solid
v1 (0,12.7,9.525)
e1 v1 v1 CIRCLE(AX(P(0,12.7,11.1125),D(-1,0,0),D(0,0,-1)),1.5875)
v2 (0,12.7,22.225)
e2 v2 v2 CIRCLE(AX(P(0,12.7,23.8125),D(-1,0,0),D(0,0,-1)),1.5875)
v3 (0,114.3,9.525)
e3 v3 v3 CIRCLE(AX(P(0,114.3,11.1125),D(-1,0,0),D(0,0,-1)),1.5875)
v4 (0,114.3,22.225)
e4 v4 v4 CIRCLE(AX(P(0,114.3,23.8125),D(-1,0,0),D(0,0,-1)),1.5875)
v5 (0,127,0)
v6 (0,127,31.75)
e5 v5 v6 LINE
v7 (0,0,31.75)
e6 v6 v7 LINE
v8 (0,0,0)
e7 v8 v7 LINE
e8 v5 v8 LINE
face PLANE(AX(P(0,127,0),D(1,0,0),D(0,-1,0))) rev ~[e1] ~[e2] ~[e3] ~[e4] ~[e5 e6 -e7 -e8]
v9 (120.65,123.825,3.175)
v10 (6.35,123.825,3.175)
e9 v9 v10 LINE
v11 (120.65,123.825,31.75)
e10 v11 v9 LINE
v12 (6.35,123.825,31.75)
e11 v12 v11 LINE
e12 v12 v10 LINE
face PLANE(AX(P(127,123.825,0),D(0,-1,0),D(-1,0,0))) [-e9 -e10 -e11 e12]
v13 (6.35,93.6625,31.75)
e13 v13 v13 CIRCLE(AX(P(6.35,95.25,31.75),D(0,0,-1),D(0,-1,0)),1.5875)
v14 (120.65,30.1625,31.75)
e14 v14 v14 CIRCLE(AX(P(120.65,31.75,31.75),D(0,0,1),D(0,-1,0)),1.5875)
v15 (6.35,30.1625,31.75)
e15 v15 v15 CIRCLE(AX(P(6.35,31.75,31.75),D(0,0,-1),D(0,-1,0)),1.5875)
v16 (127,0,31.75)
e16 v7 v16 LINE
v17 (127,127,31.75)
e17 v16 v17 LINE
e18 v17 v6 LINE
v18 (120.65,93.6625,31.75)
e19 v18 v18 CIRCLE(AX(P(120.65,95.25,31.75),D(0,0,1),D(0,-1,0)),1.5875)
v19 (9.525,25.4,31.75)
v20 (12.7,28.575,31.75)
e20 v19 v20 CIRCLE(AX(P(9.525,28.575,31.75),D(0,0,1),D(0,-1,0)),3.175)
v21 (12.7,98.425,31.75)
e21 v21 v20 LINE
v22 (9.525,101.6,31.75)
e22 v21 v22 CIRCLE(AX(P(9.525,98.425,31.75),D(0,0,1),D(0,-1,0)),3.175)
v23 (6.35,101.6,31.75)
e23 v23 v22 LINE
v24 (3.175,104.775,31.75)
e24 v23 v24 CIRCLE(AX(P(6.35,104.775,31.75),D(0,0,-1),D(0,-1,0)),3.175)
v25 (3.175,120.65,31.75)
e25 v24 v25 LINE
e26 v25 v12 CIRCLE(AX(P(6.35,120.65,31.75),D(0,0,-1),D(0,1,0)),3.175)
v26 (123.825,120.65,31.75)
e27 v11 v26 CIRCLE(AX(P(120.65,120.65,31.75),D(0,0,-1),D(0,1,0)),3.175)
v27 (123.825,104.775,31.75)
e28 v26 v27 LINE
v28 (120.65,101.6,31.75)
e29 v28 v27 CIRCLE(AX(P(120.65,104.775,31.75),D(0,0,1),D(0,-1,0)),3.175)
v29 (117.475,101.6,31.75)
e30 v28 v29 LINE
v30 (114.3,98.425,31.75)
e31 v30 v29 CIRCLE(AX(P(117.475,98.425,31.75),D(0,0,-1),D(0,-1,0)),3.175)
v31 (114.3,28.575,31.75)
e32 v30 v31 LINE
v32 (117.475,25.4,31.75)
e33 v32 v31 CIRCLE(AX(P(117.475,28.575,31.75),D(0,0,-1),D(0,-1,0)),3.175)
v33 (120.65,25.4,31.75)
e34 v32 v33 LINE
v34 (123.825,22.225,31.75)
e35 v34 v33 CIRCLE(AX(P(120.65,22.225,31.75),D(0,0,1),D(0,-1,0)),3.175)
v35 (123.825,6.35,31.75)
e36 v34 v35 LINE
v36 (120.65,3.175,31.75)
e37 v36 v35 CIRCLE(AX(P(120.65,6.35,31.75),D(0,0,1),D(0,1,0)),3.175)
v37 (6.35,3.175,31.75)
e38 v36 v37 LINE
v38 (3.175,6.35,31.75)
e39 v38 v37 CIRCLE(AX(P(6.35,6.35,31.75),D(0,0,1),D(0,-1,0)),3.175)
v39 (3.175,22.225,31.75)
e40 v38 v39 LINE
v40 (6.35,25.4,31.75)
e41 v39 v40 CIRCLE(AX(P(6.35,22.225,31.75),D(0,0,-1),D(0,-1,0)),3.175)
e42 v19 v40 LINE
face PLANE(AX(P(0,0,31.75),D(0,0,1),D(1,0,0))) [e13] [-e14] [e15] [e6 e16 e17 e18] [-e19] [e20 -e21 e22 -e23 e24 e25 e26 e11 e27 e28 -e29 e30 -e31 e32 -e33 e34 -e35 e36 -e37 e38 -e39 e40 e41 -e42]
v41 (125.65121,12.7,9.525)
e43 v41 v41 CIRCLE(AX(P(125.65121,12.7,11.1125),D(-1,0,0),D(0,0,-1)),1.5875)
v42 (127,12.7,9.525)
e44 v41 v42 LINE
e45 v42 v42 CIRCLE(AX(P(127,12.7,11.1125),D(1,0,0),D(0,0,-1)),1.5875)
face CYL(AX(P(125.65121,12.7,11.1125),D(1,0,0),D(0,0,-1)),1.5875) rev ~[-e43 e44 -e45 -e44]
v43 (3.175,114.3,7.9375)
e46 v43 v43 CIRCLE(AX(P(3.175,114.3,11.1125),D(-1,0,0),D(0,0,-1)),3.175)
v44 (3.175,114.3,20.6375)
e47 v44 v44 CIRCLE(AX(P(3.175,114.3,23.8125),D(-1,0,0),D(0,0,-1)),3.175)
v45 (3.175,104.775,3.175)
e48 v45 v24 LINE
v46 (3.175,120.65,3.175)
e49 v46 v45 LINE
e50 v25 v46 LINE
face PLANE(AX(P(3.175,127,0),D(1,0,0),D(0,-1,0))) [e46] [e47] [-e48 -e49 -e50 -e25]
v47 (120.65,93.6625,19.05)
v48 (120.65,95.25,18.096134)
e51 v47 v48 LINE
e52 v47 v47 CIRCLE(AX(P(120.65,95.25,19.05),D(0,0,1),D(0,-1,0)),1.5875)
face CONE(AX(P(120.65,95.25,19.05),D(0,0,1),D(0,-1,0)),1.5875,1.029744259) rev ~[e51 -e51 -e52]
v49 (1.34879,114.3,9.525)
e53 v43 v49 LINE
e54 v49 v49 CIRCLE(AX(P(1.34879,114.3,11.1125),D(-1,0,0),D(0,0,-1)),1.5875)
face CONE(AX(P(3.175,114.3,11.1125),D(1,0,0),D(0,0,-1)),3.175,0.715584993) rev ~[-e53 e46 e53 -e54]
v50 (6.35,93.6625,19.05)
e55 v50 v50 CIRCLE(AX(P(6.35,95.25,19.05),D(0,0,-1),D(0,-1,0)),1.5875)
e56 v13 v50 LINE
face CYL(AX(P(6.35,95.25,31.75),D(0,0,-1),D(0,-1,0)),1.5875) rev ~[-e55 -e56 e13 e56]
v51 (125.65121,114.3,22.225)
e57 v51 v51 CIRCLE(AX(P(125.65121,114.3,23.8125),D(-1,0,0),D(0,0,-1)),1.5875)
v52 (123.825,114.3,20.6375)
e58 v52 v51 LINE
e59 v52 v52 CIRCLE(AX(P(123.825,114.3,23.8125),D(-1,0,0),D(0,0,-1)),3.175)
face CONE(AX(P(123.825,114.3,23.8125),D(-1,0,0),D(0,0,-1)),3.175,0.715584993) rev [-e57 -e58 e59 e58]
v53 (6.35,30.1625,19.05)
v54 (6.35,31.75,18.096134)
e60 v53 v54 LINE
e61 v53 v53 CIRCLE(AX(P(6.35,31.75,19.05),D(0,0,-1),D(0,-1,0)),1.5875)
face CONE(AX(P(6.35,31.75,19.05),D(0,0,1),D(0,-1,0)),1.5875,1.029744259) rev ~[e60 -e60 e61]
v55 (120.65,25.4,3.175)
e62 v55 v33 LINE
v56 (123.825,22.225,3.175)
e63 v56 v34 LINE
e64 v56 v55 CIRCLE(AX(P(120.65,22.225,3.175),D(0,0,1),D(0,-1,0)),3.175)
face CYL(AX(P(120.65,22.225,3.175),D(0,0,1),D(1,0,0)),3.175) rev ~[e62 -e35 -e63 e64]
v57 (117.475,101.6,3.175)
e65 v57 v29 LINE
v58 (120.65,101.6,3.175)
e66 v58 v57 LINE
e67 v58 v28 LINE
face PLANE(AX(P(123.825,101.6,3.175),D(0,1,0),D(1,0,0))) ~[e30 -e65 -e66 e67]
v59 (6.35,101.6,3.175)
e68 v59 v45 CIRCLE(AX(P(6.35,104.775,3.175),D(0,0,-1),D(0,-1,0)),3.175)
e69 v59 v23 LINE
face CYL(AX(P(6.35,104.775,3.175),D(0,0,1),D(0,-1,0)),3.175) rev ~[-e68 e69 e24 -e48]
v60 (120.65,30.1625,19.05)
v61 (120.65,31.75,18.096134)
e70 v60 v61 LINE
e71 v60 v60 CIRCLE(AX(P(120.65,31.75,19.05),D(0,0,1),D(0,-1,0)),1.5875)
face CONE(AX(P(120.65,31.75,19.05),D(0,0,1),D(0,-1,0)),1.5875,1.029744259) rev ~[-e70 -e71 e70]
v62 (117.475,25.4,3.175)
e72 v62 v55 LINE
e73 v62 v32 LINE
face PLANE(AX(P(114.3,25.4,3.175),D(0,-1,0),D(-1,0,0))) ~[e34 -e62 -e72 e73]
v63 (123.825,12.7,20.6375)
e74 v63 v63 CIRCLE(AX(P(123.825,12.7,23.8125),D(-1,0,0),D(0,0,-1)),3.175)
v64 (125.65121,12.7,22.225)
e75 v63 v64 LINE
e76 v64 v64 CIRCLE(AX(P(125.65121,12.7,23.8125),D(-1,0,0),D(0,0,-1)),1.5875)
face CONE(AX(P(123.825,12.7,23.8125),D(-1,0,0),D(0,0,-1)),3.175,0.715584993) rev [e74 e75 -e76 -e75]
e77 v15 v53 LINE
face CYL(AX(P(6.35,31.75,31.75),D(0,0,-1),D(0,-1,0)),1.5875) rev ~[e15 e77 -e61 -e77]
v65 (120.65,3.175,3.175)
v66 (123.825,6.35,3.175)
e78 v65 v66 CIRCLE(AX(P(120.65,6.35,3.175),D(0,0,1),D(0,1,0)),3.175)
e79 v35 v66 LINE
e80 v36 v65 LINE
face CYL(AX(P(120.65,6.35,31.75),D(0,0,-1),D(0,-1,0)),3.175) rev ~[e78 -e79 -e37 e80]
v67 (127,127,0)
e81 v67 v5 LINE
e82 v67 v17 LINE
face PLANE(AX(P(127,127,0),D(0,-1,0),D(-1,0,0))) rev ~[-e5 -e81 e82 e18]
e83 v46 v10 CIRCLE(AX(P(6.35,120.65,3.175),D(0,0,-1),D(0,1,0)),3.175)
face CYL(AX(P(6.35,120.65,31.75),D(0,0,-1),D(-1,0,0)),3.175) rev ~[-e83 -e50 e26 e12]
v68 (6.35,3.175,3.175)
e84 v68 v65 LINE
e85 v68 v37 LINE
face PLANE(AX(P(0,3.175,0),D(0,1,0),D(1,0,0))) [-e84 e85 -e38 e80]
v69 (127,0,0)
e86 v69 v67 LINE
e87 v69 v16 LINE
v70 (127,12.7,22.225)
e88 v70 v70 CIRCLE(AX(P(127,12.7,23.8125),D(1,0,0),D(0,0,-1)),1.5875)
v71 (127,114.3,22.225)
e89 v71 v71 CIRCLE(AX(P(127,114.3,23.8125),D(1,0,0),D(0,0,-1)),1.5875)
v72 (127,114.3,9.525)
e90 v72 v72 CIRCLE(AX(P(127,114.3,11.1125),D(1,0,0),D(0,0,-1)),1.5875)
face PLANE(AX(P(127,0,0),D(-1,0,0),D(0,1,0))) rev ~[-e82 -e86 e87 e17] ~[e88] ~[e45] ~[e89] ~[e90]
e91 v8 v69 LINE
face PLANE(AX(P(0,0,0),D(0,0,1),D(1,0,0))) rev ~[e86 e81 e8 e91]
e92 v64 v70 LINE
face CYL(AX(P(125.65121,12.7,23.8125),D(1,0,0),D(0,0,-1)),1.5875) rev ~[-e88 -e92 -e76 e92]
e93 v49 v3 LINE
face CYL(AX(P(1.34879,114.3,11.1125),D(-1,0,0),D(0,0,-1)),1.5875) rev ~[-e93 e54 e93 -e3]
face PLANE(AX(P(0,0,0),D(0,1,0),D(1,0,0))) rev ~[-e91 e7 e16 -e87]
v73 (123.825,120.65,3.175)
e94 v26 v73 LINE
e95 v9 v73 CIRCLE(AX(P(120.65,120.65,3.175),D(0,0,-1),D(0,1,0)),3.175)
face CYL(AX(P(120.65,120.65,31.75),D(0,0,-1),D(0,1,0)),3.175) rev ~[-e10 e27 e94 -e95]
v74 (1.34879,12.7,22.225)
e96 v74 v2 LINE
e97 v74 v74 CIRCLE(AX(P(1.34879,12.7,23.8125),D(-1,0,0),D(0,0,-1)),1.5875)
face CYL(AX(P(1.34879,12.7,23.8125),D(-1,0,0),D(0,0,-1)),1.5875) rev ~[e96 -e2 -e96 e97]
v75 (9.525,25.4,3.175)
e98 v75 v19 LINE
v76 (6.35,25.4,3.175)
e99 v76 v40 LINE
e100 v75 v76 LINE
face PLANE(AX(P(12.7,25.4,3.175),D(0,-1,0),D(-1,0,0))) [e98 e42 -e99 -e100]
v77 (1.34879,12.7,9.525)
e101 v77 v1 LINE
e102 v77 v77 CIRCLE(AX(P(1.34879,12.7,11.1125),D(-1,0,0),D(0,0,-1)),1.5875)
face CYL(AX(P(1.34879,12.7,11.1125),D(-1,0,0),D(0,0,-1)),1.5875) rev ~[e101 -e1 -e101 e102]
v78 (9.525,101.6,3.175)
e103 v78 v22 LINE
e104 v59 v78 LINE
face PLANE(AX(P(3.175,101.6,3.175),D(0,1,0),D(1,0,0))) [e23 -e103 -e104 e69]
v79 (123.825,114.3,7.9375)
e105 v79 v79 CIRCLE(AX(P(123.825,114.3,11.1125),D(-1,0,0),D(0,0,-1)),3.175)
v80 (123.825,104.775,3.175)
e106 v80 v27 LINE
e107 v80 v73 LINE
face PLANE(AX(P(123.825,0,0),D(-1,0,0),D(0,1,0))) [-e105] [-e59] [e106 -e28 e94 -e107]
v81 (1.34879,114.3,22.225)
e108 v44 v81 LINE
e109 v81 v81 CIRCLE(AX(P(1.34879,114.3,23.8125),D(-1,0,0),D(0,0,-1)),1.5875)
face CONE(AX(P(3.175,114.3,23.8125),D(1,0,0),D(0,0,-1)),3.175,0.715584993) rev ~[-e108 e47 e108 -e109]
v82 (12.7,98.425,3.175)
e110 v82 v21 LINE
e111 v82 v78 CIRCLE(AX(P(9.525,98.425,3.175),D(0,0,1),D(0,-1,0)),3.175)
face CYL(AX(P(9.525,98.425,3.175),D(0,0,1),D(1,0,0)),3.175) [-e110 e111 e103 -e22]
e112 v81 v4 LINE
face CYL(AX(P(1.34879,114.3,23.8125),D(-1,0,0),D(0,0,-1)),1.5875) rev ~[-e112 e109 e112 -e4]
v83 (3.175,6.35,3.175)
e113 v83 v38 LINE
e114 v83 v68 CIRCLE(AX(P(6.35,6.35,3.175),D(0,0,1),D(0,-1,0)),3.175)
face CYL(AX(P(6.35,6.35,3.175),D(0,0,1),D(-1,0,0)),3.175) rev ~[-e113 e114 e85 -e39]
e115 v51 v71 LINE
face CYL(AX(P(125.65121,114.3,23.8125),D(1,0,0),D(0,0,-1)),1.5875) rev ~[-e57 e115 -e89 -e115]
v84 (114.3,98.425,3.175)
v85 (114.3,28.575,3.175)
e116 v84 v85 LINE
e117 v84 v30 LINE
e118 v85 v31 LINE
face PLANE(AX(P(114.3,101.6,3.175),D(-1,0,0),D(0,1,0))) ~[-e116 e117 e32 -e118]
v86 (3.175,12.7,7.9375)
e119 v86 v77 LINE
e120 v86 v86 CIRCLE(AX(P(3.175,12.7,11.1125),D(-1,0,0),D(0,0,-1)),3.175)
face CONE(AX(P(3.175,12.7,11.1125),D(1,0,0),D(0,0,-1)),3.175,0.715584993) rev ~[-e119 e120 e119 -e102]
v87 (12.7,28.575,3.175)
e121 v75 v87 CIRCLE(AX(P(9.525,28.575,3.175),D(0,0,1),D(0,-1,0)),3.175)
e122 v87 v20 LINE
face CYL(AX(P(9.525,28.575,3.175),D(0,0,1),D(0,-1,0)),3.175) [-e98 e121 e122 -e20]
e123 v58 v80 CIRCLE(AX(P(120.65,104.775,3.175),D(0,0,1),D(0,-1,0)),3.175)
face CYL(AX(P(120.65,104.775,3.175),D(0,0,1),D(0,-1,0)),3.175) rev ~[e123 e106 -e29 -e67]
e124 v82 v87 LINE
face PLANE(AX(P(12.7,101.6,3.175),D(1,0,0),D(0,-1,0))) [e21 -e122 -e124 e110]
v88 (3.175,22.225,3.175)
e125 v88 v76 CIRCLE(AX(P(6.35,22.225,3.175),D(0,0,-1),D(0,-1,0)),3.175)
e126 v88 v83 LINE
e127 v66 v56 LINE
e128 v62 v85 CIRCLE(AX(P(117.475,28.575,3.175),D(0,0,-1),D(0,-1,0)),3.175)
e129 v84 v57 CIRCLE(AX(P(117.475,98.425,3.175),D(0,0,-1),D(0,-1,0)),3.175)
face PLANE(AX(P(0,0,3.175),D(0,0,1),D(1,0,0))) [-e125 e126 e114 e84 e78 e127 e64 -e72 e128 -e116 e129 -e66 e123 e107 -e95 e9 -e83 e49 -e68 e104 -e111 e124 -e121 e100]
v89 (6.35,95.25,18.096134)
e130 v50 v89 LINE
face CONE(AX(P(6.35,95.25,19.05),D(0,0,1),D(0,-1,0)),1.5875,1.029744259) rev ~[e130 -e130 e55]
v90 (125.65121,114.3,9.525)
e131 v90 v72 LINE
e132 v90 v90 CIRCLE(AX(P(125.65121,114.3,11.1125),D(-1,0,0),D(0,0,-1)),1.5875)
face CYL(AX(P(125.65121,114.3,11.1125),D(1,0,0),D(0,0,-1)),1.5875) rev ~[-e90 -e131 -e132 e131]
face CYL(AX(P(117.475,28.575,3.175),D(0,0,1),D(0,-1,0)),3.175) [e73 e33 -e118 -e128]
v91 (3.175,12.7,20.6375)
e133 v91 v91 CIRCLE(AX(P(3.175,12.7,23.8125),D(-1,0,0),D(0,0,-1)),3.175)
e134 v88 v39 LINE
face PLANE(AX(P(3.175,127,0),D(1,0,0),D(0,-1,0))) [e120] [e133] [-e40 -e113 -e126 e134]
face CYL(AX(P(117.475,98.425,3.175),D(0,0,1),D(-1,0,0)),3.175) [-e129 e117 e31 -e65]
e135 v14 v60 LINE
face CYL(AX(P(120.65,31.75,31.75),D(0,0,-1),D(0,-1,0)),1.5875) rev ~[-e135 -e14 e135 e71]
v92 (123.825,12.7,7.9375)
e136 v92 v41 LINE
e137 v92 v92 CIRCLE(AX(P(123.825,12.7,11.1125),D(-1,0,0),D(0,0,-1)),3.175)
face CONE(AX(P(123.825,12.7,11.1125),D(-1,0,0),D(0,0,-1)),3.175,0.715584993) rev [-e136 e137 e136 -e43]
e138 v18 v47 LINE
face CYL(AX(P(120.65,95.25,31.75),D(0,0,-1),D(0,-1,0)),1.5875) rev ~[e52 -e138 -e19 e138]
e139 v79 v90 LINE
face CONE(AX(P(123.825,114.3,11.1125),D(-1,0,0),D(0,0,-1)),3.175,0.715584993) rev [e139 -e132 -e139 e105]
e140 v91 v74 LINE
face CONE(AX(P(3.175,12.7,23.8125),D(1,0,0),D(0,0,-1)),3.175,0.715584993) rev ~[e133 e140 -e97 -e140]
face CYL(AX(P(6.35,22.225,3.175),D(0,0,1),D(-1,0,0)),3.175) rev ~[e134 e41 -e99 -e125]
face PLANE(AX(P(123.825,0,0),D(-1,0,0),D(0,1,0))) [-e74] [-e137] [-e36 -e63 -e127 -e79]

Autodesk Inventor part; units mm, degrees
ref_plane "YZ Plane" through (0, 0, 0) normal (1, 0, 0) x (0, 1, 0)
ref_plane "XZ Plane" through (0, 0, 0) normal (0, 1, 0) x (-1, 0, 0)
sketch "Sketch1" plane through (0, 0, 0) normal (0, 0, 1) x (1, 0, 0)
  line L0 (0, 0) -> (127, 0)
  line L1 (127, 0) -> (127, 127)
  line L2 (127, 127) -> (0, 127)
  line L3 (0, 127) -> (0, 0)
  dimension "d0" = 127
  dimension "d1" = 127
extrude "Extrusion1" add sketch "Sketch1" along normal blind 31.75
shell "Shell1" thickness 3.175 removed faces 1 at (42.3333, 84.6667, 31.75)
sketch "Sketch3" plane through (3.175, 3.175, 3.175) normal (1, 0, 0) x (0, 0, -1)
  line L0 (0, 0) -> (-28.575, 0) construction
  line L1 (-14.2875, 0) -> (-14.2875, 120.65) construction
  line L2 (0, 120.65) -> (-28.575, 120.65) construction
  line L3 (-14.2875, 120.65) -> (-20.6375, 120.65) construction
  line L4 (-20.6375, 120.65) -> (-20.6375, 111.125) construction
  line L5 (-20.6375, 111.125) -> (-14.2875, 111.125) construction
  line L6 (-14.2875, 111.125) -> (-14.2875, 120.65) construction
  line L7 (-14.2875, 120.65) -> (-7.9375, 120.65) construction
  line L8 (-7.9375, 120.65) -> (-7.9375, 111.125) construction
  line L9 (-7.9375, 111.125) -> (-14.2875, 111.125) construction
  line L10 (-14.2875, 111.125) -> (-14.2875, 120.65) construction
  line L11 (-14.2875, 0) -> (-20.6375, 0) construction
  line L12 (-20.6375, 0) -> (-20.6375, 9.525) construction
  line L13 (-20.6375, 9.525) -> (-14.2875, 9.525) construction
  line L14 (-14.2875, 9.525) -> (-14.2875, 0) construction
  line L15 (-14.2875, 0) -> (-7.9375, 0) construction
  line L16 (-7.9375, 0) -> (-7.9375, 9.525) construction
  line L17 (-7.9375, 9.525) -> (-14.2875, 9.525) construction
  line L18 (-14.2875, 9.525) -> (-14.2875, 0) construction
  point P0 (3.175, -3.175)
  dimension "d5" = 6.35
  dimension "d6" = 9.525
  dimension "d7" = 6.35
  dimension "d8" = 6.35
  dimension "d9" = 9.525
  dimension "d10" = 6.35
  dimension "d11" = 9.525
hole "Hole1" at (3.175, 12.7, 23.8125) at (3.175, 12.7, 11.1125) at (3.175, 114.3, 23.8125) at (3.175, 114.3, 11.1125) direction (-1, 0, 0) diameter 3.175 depth 15.6718 tip angle 118 countersink diameter 6.35 countersink angle 82
ref_plane "Work Plane1" through (63.5, 0, 0) normal (1, 0, 0) x (0, 0, -1)
sketch "Sketch4" plane through (3.175, 3.175, 3.175) normal (0, 0, 1) x (1, 0, 0)
  line L0 (0, 0) -> (0, 120.65) construction
  line L1 (0, 120.65) -> (0, 98.425) construction
  line L2 (0, 0) -> (120.65, 0) construction
  line L3 (0, 0) -> (0, 22.225) construction
  line L4 (0, 98.425) -> (9.525, 98.425)
  line L5 (9.525, 98.425) -> (9.525, 22.225)
  line L6 (9.525, 22.225) -> (0, 22.225)
  line L7 (0, 22.225) -> (0, 98.425)
  point P0 (-3.175, -3.175)
  dimension "d19" = 22.225
  dimension "d20" = 22.225
  dimension "d21" = 9.525
extrude "Extrusion2" add sketch "Sketch4" along normal up to surface (28.575 mm away)
sketch "Sketch5" plane through (0, 0, 31.75) normal (0, 0, 1) x (1, 0, 0)
  line L0 (12.7, 101.6) -> (12.7, 25.4) construction
  line L1 (12.7, 25.4) -> (6.35, 25.4) construction
  line L2 (6.35, 25.4) -> (6.35, 31.75) construction
  line L3 (6.35, 31.75) -> (12.7, 31.75) construction
  line L4 (12.7, 31.75) -> (12.7, 25.4) construction
  line L5 (12.7, 101.6) -> (6.35, 101.6) construction
  line L6 (6.35, 101.6) -> (6.35, 95.25) construction
  line L7 (6.35, 95.25) -> (12.7, 95.25) construction
  line L8 (12.7, 95.25) -> (12.7, 101.6) construction
  point P0 (0, 0)
  dimension "d24" = 6.35
  dimension "d25" = 6.35
  dimension "d26" = 6.35
  dimension "d27" = 6.35
hole "Hole2" at (6.35, 95.25, 31.75) at (6.35, 31.75, 31.75) direction (0, 0, -1) diameter 3.175 depth 12.7 tip angle 118
mirror "Mirror2" about plane through (63.5, 0, 0) normal (1, 0, 0) of "Hole1", "Extrusion2", "Hole2"
fillet "Fillet1" radius 3.175 12 edges at (3.175, 123.825, 17.4625) (12.7, 101.6, 17.4625) (3.175, 101.6, 17.4625) (12.7, 25.4, 17.4625) (3.175, 25.4, 17.4625) (3.175, 3.175, 17.4625) (123.825, 3.175, 17.4625) (123.825, 25.4, 17.4625) (114.3, 25.4, 17.4625) (114.3, 101.6, 17.4625) (123.825, 101.6, 17.4625) (123.825, 123.825, 17.4625)
properties part number "wheel core"
